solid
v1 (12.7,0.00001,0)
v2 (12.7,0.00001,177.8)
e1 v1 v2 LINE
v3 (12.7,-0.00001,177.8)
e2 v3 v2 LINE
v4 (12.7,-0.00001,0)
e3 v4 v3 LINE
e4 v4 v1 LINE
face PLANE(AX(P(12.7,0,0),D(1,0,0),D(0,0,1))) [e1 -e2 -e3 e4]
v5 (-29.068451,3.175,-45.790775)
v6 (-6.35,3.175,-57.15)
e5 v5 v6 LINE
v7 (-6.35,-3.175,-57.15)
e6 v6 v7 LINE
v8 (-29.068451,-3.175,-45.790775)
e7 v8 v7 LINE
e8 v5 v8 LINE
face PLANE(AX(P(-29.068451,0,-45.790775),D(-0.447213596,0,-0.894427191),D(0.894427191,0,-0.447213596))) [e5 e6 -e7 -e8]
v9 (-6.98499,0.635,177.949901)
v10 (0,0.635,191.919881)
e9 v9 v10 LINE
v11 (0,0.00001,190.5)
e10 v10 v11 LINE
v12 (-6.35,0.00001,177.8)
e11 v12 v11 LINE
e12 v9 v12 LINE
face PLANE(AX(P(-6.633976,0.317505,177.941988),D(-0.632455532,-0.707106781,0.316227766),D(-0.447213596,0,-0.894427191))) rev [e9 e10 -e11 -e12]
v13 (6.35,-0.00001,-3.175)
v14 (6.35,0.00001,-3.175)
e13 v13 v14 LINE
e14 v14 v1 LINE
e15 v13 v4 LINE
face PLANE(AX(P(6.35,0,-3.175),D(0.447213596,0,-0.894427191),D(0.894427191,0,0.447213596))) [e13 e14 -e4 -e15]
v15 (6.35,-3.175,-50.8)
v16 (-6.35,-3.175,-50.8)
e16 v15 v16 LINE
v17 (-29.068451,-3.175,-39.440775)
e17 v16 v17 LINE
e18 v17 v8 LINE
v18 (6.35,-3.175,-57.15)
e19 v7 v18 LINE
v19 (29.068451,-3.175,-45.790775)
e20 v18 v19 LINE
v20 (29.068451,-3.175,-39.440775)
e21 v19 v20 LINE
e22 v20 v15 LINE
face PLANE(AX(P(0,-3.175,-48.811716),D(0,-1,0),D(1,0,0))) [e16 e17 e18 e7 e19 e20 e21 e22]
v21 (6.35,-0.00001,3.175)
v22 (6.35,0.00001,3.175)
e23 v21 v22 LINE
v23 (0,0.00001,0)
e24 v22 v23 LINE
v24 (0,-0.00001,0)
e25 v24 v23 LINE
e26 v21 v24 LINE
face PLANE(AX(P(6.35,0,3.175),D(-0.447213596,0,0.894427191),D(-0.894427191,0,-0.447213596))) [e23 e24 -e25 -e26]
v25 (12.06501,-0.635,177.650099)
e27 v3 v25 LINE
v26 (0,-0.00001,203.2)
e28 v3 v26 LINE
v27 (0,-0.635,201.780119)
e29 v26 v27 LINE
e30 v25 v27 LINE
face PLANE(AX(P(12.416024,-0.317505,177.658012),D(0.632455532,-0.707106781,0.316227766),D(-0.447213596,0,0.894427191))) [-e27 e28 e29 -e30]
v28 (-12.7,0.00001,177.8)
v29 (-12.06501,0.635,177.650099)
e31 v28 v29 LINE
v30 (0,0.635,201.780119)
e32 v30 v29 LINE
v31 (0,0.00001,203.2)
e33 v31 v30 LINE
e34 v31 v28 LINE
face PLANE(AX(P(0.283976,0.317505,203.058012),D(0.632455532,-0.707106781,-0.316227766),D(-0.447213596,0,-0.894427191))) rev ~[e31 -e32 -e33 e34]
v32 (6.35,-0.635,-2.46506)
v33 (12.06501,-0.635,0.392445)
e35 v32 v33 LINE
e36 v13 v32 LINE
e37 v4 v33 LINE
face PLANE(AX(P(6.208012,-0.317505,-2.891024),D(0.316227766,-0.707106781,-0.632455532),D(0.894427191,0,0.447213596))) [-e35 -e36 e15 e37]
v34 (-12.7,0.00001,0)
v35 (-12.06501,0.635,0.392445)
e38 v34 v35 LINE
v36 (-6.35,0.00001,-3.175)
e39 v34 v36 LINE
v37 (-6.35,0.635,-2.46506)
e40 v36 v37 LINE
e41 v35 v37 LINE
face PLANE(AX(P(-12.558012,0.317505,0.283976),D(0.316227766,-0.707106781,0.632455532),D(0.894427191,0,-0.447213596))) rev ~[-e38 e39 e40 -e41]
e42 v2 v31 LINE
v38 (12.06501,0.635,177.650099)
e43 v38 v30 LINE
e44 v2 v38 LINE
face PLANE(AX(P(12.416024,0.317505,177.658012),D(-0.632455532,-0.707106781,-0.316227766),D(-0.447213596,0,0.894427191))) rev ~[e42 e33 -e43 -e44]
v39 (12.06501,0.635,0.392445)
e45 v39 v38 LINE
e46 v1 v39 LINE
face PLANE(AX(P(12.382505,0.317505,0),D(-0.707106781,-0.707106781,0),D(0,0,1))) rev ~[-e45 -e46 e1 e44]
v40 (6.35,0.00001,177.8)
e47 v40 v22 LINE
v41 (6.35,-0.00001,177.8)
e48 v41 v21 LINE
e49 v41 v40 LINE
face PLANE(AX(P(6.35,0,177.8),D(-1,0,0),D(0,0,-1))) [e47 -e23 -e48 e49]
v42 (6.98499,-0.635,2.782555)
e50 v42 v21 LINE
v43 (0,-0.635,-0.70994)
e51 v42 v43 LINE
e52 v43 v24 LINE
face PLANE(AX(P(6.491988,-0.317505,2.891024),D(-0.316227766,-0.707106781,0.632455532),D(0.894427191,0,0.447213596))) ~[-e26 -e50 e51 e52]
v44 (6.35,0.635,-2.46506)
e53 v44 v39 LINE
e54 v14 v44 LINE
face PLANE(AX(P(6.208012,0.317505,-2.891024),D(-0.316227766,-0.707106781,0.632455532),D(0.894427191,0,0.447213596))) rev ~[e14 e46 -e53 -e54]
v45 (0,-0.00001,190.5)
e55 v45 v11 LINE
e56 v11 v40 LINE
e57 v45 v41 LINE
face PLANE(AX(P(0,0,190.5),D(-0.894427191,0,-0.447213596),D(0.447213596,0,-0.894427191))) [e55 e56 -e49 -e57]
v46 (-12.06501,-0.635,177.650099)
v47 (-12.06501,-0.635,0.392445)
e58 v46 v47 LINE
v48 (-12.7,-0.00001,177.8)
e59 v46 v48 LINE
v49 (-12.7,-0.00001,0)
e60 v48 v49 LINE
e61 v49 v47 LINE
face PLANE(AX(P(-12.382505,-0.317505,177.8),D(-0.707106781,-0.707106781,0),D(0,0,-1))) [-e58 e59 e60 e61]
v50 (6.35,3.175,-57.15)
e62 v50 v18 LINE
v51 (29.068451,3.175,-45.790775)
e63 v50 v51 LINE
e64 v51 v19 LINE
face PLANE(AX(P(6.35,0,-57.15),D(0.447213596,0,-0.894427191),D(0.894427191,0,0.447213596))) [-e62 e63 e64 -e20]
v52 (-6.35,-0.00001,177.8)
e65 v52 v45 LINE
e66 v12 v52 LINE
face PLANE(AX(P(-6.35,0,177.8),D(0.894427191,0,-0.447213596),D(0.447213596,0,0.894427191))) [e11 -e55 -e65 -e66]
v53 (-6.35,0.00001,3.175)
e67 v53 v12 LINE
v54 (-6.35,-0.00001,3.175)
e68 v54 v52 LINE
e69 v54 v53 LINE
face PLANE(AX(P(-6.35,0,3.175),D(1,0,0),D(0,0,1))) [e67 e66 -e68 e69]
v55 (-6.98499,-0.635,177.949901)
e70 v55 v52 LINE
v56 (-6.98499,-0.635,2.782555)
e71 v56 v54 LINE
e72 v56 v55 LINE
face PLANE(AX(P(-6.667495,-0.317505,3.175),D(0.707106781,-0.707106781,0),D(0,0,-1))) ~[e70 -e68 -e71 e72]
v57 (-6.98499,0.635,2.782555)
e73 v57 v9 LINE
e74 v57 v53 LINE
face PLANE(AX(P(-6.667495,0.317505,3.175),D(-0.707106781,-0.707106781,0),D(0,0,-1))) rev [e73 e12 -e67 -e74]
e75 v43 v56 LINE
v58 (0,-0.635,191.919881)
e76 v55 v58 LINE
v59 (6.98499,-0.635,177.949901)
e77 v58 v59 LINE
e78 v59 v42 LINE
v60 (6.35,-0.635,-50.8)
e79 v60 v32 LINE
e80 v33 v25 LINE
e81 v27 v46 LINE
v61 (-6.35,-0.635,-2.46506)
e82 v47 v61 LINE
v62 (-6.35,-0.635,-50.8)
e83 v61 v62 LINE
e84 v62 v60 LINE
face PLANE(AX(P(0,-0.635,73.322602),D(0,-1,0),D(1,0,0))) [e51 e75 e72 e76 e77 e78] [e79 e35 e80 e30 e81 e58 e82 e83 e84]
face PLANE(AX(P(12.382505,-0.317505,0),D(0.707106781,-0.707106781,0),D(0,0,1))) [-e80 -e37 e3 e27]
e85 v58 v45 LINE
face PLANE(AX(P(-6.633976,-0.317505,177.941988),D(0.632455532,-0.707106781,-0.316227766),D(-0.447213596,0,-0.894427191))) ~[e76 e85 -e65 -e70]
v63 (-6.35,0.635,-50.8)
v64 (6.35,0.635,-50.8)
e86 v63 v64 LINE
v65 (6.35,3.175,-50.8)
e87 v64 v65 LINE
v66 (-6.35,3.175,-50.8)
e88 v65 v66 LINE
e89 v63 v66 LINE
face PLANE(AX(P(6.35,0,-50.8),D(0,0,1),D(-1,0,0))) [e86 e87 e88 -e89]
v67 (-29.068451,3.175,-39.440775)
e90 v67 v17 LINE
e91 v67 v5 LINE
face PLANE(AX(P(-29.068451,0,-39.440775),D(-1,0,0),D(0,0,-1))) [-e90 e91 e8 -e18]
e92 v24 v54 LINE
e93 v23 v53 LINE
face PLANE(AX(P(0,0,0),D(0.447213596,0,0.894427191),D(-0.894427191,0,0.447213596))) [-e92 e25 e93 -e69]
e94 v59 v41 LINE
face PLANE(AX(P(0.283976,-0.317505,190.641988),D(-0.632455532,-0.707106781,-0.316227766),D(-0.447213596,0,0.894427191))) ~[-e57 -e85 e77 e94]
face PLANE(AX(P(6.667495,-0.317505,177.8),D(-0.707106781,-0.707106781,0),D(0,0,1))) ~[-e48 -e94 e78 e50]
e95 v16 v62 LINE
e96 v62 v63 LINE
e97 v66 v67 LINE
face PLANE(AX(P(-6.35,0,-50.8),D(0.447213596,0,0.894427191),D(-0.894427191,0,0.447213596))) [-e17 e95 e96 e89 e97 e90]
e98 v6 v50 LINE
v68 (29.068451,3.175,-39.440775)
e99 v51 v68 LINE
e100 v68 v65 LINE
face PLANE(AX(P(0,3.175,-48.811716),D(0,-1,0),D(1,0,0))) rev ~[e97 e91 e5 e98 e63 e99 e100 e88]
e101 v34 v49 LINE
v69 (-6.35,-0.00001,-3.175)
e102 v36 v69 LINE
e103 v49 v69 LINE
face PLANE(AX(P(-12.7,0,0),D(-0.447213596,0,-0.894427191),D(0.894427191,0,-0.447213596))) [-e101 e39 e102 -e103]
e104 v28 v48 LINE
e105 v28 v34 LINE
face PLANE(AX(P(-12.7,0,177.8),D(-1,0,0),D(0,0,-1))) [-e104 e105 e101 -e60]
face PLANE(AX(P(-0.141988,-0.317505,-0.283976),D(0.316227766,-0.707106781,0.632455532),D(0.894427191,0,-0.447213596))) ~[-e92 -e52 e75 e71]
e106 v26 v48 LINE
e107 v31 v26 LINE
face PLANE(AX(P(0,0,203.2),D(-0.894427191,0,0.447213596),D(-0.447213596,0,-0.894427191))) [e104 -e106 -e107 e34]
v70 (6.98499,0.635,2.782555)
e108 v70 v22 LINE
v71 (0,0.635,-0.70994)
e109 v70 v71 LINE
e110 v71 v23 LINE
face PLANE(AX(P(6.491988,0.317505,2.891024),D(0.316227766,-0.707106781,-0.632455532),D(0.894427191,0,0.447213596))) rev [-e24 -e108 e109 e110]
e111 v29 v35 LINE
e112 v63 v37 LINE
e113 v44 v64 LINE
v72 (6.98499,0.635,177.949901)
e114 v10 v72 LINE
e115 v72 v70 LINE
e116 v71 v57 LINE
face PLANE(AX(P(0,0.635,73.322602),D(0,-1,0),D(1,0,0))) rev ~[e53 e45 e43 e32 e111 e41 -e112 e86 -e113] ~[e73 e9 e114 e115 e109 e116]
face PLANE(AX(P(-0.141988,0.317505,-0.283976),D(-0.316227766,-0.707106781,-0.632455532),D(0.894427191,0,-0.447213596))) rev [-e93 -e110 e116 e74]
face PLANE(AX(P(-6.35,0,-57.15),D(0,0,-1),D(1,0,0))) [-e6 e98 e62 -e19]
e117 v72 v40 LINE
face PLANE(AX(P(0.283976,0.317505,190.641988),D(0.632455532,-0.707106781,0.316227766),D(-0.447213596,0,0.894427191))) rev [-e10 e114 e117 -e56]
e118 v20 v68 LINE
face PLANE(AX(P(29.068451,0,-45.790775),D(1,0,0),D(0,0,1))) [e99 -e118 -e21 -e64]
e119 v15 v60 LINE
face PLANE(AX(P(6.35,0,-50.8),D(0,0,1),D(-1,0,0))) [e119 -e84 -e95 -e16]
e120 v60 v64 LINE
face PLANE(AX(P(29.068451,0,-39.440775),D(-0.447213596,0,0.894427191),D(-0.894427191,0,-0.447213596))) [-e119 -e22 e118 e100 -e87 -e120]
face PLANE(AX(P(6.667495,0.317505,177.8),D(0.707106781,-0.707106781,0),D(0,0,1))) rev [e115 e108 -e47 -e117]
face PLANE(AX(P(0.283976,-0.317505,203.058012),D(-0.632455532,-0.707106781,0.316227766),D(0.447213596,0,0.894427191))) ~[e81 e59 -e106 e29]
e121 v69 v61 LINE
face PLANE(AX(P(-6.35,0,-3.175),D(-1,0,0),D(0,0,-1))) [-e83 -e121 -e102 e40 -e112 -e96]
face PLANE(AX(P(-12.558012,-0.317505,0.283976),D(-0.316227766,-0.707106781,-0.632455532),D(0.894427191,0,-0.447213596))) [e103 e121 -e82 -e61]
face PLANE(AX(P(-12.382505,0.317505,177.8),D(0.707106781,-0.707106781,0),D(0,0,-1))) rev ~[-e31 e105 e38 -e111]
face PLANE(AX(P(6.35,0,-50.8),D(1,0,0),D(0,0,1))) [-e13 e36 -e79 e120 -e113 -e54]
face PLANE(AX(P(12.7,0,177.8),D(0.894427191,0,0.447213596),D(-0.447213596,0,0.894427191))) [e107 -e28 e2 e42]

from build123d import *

# Parameters (mm, degrees)
F1_DEPTH = 0.635
F2_SIZE  = 0.63499
F3_DEPTH = 3.175
F4_SIZE  = 0.63499


# Not quite as in the source:
# - a fillet or chamfer is up to 0.001 mm smaller than in the source, because OpenCascade refuses the exact size


with BuildPart() as f1:
    # F0 (on Front) → F1 (new body, symmetric)
    with BuildSketch(Plane.XZ):
        Polygon((12.7, 177.8), (0, 203.2), (-12.7, 177.8), (-12.7, 0), (-6.35, -3.175), (-6.35, -50.8), (0, -50.8), (6.35, -50.8), (6.35, -3.175), (12.7, 0), align=None)
        Polygon((-6.35, 177.8), (0, 190.5), (6.35, 177.8), (6.35, 3.175), (0, 0), (-6.35, 3.175), align=None, mode=Mode.SUBTRACT)
    extrude(amount=F1_DEPTH, both=True)

    # F2 (size 0.635 in the source; OpenCascade refuses exactly that, so slightly less here)
    f2_edges = [f1.edges().sort_by_distance(p)[0] for p in [
        (12.7, -0.635, 88.9),
        (6.35, -0.635, 190.5),
        (-6.35, -0.635, 190.5),
        (-12.7, -0.635, 88.9),
        (-9.525, -0.635, -1.5875),
        (9.525, -0.635, -1.5875),
        (-9.525, 0.635, -1.5875),
        (9.525, 0.635, -1.5875),
        (-12.7, 0.635, 88.9),
        (12.7, 0.635, 88.9),
        (-6.35, 0.635, 190.5),
        (6.35, 0.635, 190.5),
    ]]
    chamfer(f2_edges, length=F2_SIZE)

    # F0 (on Front) → F3 (join, symmetric)
    with BuildSketch(Plane.XZ):
        Polygon((0, -50.8), (-6.35, -50.8), (-29.0684506514, -39.4407746743), (-29.0684506514, -45.7907746743), (-6.35, -57.15), (-3.175, -57.15), (0, -57.15), (3.175, -57.15), (6.35, -57.15), (29.0684506514, -45.7907746743), (29.0684506514, -39.4407746743), (6.35, -50.8), align=None)
    extrude(amount=F3_DEPTH, both=True)

    # F4 (size 0.635 in the source; OpenCascade refuses exactly that, so slightly less here)
    f4_edges = [f1.edges().sort_by_distance(p)[0] for p in [
        (6.35, -0.635, 90.4875),
        (-6.35, -0.635, 90.4875),
        (3.175, -0.635, 1.5875),
        (-3.175, -0.635, 1.5875),
        (-3.175, -0.635, 184.15),
        (3.175, -0.635, 184.15),
        (3.175, 0.635, 184.15),
        (-3.175, 0.635, 184.15),
        (-6.35, 0.635, 90.4875),
        (6.35, 0.635, 90.4875),
        (-3.175, 0.635, 1.5875),
        (3.175, 0.635, 1.5875),
    ]]
    chamfer(f4_edges, length=F4_SIZE)


solid = f1.part
